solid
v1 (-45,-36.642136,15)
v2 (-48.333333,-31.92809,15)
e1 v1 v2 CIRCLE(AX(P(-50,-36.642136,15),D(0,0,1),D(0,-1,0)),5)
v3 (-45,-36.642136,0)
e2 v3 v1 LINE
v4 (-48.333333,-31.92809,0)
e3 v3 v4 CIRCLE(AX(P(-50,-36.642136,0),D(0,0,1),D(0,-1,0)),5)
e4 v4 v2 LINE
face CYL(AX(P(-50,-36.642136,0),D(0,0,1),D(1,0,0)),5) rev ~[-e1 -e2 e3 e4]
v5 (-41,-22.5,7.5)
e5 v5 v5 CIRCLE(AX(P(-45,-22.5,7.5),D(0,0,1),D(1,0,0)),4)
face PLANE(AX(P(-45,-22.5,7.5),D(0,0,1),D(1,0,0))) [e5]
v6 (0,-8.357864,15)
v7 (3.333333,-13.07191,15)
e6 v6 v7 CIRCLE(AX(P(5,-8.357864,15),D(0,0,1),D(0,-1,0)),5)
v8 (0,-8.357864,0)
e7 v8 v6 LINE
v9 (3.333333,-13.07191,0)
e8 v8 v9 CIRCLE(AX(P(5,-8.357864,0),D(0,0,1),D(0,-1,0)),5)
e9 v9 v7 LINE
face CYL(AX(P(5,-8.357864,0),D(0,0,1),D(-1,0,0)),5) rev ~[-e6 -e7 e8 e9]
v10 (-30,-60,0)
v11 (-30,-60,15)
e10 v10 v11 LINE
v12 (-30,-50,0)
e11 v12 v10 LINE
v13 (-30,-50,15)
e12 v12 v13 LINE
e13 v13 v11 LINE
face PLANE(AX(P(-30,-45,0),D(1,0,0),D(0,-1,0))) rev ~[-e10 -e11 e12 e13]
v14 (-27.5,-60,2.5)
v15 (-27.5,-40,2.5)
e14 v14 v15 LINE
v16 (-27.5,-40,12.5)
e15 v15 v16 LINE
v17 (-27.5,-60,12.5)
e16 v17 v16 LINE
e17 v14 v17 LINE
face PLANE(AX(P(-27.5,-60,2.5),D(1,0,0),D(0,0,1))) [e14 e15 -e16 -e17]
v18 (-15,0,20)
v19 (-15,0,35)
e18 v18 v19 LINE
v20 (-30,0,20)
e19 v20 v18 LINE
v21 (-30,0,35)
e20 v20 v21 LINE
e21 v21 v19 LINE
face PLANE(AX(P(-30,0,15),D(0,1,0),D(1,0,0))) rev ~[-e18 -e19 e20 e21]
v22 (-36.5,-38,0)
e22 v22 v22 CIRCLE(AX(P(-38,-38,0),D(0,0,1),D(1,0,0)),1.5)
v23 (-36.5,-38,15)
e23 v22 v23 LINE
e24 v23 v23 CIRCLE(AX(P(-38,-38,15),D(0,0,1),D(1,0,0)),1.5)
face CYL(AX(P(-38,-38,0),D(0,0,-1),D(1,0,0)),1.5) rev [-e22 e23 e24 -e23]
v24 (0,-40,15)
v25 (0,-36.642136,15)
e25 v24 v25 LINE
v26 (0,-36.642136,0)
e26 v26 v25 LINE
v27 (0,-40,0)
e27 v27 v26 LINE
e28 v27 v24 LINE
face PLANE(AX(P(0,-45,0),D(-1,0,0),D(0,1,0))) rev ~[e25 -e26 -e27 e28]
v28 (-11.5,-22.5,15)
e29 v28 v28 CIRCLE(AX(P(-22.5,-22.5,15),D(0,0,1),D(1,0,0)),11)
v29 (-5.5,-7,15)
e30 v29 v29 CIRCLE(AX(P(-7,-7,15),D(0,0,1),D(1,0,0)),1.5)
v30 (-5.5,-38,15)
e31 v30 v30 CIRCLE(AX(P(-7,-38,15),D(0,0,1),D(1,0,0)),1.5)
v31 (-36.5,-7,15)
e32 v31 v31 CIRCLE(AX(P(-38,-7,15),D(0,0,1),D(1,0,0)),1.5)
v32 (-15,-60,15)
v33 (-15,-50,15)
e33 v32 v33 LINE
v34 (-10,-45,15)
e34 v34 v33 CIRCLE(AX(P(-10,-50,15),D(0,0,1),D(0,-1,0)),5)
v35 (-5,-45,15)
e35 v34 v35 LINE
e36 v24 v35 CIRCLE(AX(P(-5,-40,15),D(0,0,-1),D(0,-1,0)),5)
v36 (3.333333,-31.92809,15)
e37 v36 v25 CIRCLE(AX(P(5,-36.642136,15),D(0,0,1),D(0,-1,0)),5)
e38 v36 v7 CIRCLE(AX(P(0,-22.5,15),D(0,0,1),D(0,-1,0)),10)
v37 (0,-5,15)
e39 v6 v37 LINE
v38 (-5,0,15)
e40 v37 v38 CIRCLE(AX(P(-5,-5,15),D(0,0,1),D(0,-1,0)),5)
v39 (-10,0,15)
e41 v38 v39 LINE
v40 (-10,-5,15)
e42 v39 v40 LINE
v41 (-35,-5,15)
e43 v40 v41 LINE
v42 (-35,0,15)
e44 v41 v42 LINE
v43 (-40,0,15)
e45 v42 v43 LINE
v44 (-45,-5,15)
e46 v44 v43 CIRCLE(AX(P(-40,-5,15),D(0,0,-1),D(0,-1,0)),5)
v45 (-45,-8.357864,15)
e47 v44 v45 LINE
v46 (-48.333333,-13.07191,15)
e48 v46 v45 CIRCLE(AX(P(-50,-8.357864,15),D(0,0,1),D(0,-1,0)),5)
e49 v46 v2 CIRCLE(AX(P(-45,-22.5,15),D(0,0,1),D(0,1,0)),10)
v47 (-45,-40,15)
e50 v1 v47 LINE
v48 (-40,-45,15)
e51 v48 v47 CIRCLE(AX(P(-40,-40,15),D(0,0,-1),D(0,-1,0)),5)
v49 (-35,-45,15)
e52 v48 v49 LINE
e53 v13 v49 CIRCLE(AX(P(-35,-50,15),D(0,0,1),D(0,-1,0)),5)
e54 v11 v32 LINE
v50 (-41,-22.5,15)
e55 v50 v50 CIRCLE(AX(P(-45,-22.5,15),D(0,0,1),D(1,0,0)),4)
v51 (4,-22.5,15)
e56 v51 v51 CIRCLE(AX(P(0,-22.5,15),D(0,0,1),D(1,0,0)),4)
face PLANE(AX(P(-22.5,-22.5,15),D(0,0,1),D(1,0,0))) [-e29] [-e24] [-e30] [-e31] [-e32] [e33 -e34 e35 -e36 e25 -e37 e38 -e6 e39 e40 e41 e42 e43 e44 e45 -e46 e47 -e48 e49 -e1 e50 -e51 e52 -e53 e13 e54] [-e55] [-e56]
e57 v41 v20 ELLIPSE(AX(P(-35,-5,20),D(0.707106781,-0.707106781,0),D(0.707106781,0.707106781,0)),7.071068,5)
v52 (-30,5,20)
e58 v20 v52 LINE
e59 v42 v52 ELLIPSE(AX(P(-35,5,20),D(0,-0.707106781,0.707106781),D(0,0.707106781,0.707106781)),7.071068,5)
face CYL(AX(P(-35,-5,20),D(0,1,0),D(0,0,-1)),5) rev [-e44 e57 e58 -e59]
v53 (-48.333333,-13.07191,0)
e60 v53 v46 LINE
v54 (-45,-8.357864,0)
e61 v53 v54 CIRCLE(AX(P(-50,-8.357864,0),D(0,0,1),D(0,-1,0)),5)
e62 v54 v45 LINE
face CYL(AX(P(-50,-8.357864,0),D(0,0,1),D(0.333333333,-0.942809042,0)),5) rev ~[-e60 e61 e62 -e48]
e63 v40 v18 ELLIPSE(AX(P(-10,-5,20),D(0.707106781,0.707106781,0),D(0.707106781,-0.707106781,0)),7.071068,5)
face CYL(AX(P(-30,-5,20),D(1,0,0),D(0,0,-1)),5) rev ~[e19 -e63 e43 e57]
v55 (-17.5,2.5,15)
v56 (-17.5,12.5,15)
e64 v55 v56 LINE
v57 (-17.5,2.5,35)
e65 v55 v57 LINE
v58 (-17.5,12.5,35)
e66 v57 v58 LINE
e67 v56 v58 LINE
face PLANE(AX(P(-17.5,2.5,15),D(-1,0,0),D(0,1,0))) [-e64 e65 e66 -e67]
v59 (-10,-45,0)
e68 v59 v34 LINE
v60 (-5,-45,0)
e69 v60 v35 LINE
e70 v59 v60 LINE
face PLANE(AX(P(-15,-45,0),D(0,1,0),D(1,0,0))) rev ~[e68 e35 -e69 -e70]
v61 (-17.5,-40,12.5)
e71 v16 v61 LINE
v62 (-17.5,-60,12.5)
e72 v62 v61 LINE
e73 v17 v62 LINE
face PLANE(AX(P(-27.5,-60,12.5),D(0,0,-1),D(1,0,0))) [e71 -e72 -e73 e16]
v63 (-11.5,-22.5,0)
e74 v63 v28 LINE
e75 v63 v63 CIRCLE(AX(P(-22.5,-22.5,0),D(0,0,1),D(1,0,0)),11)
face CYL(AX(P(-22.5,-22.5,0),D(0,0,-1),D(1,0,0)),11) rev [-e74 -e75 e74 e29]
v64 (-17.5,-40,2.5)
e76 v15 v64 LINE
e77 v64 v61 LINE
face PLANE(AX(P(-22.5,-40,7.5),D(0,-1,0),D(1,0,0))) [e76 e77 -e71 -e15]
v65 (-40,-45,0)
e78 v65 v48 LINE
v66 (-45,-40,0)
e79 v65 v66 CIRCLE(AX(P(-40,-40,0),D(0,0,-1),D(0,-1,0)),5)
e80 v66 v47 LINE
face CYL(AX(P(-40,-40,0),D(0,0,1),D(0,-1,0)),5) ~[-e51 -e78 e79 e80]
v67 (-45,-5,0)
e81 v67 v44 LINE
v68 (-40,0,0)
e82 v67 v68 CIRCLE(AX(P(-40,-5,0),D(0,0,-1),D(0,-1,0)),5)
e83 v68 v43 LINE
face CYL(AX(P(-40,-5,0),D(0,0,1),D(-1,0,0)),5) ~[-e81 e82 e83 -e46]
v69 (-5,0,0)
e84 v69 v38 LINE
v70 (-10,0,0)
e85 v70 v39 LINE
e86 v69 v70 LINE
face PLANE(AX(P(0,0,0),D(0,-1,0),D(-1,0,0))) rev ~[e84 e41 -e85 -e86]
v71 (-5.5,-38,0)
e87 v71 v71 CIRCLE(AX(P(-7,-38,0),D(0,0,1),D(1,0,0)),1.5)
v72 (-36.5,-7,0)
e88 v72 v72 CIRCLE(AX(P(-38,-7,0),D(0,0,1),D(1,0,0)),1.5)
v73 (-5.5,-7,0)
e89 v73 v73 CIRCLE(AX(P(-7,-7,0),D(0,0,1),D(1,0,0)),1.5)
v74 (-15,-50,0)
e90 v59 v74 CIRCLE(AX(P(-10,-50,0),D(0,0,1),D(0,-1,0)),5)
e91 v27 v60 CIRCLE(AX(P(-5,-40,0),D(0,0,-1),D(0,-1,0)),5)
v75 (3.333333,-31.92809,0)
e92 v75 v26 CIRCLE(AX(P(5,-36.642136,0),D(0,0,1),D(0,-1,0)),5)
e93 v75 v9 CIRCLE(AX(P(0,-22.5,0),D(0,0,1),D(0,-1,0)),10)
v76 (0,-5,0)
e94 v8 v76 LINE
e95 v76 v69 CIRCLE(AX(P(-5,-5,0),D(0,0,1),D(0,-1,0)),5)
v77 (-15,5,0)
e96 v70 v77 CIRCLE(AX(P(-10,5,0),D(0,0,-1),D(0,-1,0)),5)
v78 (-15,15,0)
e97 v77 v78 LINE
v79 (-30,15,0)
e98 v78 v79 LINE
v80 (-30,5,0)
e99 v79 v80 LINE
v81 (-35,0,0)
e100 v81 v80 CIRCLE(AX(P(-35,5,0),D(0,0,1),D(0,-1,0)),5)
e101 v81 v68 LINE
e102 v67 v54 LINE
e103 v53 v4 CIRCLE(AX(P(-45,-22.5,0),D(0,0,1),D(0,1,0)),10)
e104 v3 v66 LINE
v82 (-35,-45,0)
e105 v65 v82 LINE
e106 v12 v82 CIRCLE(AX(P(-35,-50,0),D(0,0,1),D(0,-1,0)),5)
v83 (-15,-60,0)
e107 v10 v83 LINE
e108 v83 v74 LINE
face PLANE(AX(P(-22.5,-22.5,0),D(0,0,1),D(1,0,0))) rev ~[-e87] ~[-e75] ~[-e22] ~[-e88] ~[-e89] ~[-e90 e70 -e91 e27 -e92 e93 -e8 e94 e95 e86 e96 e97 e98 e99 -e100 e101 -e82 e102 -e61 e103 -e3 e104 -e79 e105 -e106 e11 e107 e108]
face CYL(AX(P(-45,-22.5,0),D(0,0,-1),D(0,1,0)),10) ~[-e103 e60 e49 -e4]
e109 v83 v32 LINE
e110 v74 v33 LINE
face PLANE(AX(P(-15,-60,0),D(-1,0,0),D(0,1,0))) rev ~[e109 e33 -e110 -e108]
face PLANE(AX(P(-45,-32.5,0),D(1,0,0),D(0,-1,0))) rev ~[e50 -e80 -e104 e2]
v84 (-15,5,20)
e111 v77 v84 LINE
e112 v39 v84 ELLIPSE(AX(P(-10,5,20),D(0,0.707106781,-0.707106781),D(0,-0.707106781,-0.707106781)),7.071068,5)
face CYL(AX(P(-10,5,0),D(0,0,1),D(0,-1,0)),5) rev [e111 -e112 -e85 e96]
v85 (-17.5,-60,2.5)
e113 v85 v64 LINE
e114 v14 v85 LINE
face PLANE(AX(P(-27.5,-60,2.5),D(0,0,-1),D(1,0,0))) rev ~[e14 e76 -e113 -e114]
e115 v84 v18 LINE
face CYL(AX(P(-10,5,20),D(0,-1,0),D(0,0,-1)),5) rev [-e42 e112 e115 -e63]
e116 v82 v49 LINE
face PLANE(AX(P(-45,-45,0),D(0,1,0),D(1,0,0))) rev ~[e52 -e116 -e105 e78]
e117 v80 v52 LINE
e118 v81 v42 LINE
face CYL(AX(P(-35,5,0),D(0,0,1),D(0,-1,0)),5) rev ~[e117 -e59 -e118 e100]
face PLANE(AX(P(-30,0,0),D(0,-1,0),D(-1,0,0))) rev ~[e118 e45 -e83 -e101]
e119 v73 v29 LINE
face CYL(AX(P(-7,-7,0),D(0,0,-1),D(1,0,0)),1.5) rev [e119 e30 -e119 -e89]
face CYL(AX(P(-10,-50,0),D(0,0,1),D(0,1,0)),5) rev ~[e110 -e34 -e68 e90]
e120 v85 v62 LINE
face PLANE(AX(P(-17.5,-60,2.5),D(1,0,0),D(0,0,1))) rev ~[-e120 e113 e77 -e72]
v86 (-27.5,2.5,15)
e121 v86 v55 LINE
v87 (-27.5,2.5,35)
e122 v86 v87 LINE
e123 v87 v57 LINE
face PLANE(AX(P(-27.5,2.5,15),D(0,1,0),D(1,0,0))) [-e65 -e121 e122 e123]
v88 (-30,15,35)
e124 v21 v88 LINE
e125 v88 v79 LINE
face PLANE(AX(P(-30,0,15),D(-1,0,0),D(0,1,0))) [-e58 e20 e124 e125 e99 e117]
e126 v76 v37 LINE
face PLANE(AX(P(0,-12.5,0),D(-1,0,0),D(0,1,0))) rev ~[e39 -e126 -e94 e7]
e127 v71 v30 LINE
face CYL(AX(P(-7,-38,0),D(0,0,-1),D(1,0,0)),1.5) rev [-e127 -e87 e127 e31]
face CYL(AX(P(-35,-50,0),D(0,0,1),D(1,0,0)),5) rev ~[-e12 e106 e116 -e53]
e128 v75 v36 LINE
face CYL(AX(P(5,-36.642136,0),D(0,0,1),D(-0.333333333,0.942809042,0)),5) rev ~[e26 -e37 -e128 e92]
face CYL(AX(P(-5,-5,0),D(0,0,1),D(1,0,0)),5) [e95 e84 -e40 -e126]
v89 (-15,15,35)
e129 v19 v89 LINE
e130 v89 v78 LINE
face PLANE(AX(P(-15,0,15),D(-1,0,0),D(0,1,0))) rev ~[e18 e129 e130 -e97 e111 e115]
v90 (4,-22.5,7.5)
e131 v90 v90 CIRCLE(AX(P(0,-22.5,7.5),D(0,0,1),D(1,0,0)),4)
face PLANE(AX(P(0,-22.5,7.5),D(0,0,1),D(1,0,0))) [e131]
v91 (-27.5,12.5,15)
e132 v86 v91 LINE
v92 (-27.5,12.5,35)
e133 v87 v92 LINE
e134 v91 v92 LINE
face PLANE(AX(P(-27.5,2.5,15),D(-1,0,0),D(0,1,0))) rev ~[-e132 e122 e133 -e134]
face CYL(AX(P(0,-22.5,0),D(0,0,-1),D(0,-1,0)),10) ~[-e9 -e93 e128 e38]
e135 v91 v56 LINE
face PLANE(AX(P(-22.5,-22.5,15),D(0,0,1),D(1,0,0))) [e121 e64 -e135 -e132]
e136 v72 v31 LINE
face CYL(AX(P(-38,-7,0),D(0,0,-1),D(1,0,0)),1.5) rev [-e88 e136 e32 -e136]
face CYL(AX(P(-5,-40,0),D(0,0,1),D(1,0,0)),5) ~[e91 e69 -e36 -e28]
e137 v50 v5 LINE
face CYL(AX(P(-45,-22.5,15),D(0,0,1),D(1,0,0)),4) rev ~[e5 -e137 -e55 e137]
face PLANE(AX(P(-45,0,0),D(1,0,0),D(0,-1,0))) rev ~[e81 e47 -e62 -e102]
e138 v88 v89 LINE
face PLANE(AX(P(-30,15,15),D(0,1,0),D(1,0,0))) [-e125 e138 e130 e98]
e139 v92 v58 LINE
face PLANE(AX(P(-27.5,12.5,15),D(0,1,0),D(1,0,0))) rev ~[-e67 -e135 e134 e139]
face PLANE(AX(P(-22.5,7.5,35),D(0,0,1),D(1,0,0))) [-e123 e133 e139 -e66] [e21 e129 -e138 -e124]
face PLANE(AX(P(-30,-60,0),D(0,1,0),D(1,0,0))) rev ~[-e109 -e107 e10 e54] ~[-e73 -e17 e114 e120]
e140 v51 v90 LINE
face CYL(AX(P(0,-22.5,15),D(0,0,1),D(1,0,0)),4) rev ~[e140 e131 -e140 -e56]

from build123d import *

# Parameters (mm, degrees)
F0_R     = 1.5
F0_R_2   = 11
F1_DEPTH = 15
F2_W     = 10
F2_H     = 10
F3_DEPTH = 20
F4_W     = 15
F4_H     = 15
F4_W_2   = 10
F4_H_2   = 10
F5_DEPTH = 20
F6_F1_R  = 5
F6_F2_R  = 5
F6_F3_R  = 5
F6_F4_R  = 5
F6_F5_R  = 5
F6_F6_R  = 5
F6_F7_R  = 5
F6_F8_R  = 5
F6_F9_R  = 5
F6_F10_R = 5
F6_F11_R = 5
F6_F12_R = 5
F6_F13_R = 5
F7_R     = 4
F8_DEPTH = 7.5
F9_R     = 5


with BuildPart() as f1:
    # F0 (on Top) → F1 (new body)
    with BuildSketch(Plane.XY):
        with BuildLine():
            Line((-45, -32.5), (-45, -45))
            Line((-45, -45), (-30, -45))
            Line((-30, -45), (-30, -60))
            Line((-30, -60), (-15, -60))
            Line((-15, -60), (-15, -45))
            Line((-15, -45), (0, -45))
            Line((0, -45), (0, -32.5))
            ThreePointArc((0, -32.5), (10, -22.5), (0, -12.5))
            Line((0, -12.5), (0, 0))
            Line((0, 0), (-15, 0))
            Line((-15, 0), (-15, 15))
            Line((-15, 15), (-30, 15))
            Line((-30, 15), (-30, 0))
            Line((-30, 0), (-45, 0))
            Line((-45, 0), (-45, -12.5))
            ThreePointArc((-45, -12.5), (-55, -22.5), (-45, -32.5))
        make_face()
        with Locations((-38, -38)):
            Circle(F0_R, mode=Mode.SUBTRACT)
        with Locations((-7, -38)):
            Circle(F0_R, mode=Mode.SUBTRACT)
        with Locations((-38, -7)):
            Circle(F0_R, mode=Mode.SUBTRACT)
        with Locations((-22.5, -22.5)):
            Circle(F0_R_2, mode=Mode.SUBTRACT)
        with Locations((-7, -7)):
            Circle(F0_R, mode=Mode.SUBTRACT)
    extrude(amount=F1_DEPTH)

    # F2 (on face) → F3 (cut)
    with BuildSketch(Plane.XZ.offset(60)):
        with Locations((-22.5, 7.5)):
            Rectangle(F2_W, F2_H)
    extrude(amount=-F3_DEPTH, mode=Mode.SUBTRACT)

    # F4 (on face) → F5 (join)
    with BuildSketch(Plane.XY.offset(15)):
        with Locations((-22.5, 7.5)):
            Rectangle(F4_W, F4_H)
        with Locations((-22.5, 7.5)):
            Rectangle(F4_W_2, F4_H_2, mode=Mode.SUBTRACT)
    extrude(amount=F5_DEPTH)

    # F6: fillet of radius 5 on 13 edges, made by hand

    # F6_f1
    f6_f1_edges = [f1.edges().sort_by_distance(p)[0] for p in [
        (-15, 0, 7.5),
    ]]
    fillet(f6_f1_edges, radius=F6_F1_R)

    # F6_f2
    f6_f2_edges = [f1.edges().sort_by_distance(p)[0] for p in [
        (-22.5, 0, 15),
    ]]
    fillet(f6_f2_edges, radius=F6_F2_R)

    # F6_f3
    f6_f3_edges = [f1.edges().sort_by_distance(p)[0] for p in [
        (0, -12.5, 7.5),
    ]]
    fillet(f6_f3_edges, radius=F6_F3_R)

    # F6_f4
    f6_f4_edges = [f1.edges().sort_by_distance(p)[0] for p in [
        (0, 0, 7.5),
    ]]
    fillet(f6_f4_edges, radius=F6_F4_R)

    # F6_f5
    f6_f5_edges = [f1.edges().sort_by_distance(p)[0] for p in [
        (0, -32.5, 7.5),
    ]]
    fillet(f6_f5_edges, radius=F6_F5_R)

    # F6_f6
    f6_f6_edges = [f1.edges().sort_by_distance(p)[0] for p in [
        (0, -45, 7.5),
    ]]
    fillet(f6_f6_edges, radius=F6_F6_R)

    # F6_f7
    f6_f7_edges = [f1.edges().sort_by_distance(p)[0] for p in [
        (-15, -45, 7.5),
    ]]
    fillet(f6_f7_edges, radius=F6_F7_R)

    # F6_f8
    f6_f8_edges = [f1.edges().sort_by_distance(p)[0] for p in [
        (-30, -45, 7.5),
    ]]
    fillet(f6_f8_edges, radius=F6_F8_R)

    # F6_f9
    f6_f9_edges = [f1.edges().sort_by_distance(p)[0] for p in [
        (-45, -45, 7.5),
    ]]
    fillet(f6_f9_edges, radius=F6_F9_R)

    # F6_f10
    f6_f10_edges = [f1.edges().sort_by_distance(p)[0] for p in [
        (-45, -32.5, 7.5),
    ]]
    fillet(f6_f10_edges, radius=F6_F10_R)

    # F6_f11
    f6_f11_edges = [f1.edges().sort_by_distance(p)[0] for p in [
        (-45, -12.5, 7.5),
    ]]
    fillet(f6_f11_edges, radius=F6_F11_R)

    # F6_f12
    f6_f12_edges = [f1.edges().sort_by_distance(p)[0] for p in [
        (-45, 0, 7.5),
    ]]
    fillet(f6_f12_edges, radius=F6_F12_R)

    # F6_f13
    f6_f13_edges = [f1.edges().sort_by_distance(p)[0] for p in [
        (-30, 0, 7.5),
    ]]
    fillet(f6_f13_edges, radius=F6_F13_R)

    # F7 (on face) → F8 (cut)
    with BuildSketch(Plane.XY.offset(15)):
        with Locations((-45, -22.5)):
            Circle(F7_R)
        with Locations((0, -22.5)):
            Circle(F7_R)
    extrude(amount=-F8_DEPTH, mode=Mode.SUBTRACT)

    # F9
    f9_edges = [f1.edges().sort_by_distance(p)[0] for p in [
        (-15, 0, 15),
        (-30, 0, 15),
    ]]
    fillet(f9_edges, radius=F9_R)


solid = f1.part
